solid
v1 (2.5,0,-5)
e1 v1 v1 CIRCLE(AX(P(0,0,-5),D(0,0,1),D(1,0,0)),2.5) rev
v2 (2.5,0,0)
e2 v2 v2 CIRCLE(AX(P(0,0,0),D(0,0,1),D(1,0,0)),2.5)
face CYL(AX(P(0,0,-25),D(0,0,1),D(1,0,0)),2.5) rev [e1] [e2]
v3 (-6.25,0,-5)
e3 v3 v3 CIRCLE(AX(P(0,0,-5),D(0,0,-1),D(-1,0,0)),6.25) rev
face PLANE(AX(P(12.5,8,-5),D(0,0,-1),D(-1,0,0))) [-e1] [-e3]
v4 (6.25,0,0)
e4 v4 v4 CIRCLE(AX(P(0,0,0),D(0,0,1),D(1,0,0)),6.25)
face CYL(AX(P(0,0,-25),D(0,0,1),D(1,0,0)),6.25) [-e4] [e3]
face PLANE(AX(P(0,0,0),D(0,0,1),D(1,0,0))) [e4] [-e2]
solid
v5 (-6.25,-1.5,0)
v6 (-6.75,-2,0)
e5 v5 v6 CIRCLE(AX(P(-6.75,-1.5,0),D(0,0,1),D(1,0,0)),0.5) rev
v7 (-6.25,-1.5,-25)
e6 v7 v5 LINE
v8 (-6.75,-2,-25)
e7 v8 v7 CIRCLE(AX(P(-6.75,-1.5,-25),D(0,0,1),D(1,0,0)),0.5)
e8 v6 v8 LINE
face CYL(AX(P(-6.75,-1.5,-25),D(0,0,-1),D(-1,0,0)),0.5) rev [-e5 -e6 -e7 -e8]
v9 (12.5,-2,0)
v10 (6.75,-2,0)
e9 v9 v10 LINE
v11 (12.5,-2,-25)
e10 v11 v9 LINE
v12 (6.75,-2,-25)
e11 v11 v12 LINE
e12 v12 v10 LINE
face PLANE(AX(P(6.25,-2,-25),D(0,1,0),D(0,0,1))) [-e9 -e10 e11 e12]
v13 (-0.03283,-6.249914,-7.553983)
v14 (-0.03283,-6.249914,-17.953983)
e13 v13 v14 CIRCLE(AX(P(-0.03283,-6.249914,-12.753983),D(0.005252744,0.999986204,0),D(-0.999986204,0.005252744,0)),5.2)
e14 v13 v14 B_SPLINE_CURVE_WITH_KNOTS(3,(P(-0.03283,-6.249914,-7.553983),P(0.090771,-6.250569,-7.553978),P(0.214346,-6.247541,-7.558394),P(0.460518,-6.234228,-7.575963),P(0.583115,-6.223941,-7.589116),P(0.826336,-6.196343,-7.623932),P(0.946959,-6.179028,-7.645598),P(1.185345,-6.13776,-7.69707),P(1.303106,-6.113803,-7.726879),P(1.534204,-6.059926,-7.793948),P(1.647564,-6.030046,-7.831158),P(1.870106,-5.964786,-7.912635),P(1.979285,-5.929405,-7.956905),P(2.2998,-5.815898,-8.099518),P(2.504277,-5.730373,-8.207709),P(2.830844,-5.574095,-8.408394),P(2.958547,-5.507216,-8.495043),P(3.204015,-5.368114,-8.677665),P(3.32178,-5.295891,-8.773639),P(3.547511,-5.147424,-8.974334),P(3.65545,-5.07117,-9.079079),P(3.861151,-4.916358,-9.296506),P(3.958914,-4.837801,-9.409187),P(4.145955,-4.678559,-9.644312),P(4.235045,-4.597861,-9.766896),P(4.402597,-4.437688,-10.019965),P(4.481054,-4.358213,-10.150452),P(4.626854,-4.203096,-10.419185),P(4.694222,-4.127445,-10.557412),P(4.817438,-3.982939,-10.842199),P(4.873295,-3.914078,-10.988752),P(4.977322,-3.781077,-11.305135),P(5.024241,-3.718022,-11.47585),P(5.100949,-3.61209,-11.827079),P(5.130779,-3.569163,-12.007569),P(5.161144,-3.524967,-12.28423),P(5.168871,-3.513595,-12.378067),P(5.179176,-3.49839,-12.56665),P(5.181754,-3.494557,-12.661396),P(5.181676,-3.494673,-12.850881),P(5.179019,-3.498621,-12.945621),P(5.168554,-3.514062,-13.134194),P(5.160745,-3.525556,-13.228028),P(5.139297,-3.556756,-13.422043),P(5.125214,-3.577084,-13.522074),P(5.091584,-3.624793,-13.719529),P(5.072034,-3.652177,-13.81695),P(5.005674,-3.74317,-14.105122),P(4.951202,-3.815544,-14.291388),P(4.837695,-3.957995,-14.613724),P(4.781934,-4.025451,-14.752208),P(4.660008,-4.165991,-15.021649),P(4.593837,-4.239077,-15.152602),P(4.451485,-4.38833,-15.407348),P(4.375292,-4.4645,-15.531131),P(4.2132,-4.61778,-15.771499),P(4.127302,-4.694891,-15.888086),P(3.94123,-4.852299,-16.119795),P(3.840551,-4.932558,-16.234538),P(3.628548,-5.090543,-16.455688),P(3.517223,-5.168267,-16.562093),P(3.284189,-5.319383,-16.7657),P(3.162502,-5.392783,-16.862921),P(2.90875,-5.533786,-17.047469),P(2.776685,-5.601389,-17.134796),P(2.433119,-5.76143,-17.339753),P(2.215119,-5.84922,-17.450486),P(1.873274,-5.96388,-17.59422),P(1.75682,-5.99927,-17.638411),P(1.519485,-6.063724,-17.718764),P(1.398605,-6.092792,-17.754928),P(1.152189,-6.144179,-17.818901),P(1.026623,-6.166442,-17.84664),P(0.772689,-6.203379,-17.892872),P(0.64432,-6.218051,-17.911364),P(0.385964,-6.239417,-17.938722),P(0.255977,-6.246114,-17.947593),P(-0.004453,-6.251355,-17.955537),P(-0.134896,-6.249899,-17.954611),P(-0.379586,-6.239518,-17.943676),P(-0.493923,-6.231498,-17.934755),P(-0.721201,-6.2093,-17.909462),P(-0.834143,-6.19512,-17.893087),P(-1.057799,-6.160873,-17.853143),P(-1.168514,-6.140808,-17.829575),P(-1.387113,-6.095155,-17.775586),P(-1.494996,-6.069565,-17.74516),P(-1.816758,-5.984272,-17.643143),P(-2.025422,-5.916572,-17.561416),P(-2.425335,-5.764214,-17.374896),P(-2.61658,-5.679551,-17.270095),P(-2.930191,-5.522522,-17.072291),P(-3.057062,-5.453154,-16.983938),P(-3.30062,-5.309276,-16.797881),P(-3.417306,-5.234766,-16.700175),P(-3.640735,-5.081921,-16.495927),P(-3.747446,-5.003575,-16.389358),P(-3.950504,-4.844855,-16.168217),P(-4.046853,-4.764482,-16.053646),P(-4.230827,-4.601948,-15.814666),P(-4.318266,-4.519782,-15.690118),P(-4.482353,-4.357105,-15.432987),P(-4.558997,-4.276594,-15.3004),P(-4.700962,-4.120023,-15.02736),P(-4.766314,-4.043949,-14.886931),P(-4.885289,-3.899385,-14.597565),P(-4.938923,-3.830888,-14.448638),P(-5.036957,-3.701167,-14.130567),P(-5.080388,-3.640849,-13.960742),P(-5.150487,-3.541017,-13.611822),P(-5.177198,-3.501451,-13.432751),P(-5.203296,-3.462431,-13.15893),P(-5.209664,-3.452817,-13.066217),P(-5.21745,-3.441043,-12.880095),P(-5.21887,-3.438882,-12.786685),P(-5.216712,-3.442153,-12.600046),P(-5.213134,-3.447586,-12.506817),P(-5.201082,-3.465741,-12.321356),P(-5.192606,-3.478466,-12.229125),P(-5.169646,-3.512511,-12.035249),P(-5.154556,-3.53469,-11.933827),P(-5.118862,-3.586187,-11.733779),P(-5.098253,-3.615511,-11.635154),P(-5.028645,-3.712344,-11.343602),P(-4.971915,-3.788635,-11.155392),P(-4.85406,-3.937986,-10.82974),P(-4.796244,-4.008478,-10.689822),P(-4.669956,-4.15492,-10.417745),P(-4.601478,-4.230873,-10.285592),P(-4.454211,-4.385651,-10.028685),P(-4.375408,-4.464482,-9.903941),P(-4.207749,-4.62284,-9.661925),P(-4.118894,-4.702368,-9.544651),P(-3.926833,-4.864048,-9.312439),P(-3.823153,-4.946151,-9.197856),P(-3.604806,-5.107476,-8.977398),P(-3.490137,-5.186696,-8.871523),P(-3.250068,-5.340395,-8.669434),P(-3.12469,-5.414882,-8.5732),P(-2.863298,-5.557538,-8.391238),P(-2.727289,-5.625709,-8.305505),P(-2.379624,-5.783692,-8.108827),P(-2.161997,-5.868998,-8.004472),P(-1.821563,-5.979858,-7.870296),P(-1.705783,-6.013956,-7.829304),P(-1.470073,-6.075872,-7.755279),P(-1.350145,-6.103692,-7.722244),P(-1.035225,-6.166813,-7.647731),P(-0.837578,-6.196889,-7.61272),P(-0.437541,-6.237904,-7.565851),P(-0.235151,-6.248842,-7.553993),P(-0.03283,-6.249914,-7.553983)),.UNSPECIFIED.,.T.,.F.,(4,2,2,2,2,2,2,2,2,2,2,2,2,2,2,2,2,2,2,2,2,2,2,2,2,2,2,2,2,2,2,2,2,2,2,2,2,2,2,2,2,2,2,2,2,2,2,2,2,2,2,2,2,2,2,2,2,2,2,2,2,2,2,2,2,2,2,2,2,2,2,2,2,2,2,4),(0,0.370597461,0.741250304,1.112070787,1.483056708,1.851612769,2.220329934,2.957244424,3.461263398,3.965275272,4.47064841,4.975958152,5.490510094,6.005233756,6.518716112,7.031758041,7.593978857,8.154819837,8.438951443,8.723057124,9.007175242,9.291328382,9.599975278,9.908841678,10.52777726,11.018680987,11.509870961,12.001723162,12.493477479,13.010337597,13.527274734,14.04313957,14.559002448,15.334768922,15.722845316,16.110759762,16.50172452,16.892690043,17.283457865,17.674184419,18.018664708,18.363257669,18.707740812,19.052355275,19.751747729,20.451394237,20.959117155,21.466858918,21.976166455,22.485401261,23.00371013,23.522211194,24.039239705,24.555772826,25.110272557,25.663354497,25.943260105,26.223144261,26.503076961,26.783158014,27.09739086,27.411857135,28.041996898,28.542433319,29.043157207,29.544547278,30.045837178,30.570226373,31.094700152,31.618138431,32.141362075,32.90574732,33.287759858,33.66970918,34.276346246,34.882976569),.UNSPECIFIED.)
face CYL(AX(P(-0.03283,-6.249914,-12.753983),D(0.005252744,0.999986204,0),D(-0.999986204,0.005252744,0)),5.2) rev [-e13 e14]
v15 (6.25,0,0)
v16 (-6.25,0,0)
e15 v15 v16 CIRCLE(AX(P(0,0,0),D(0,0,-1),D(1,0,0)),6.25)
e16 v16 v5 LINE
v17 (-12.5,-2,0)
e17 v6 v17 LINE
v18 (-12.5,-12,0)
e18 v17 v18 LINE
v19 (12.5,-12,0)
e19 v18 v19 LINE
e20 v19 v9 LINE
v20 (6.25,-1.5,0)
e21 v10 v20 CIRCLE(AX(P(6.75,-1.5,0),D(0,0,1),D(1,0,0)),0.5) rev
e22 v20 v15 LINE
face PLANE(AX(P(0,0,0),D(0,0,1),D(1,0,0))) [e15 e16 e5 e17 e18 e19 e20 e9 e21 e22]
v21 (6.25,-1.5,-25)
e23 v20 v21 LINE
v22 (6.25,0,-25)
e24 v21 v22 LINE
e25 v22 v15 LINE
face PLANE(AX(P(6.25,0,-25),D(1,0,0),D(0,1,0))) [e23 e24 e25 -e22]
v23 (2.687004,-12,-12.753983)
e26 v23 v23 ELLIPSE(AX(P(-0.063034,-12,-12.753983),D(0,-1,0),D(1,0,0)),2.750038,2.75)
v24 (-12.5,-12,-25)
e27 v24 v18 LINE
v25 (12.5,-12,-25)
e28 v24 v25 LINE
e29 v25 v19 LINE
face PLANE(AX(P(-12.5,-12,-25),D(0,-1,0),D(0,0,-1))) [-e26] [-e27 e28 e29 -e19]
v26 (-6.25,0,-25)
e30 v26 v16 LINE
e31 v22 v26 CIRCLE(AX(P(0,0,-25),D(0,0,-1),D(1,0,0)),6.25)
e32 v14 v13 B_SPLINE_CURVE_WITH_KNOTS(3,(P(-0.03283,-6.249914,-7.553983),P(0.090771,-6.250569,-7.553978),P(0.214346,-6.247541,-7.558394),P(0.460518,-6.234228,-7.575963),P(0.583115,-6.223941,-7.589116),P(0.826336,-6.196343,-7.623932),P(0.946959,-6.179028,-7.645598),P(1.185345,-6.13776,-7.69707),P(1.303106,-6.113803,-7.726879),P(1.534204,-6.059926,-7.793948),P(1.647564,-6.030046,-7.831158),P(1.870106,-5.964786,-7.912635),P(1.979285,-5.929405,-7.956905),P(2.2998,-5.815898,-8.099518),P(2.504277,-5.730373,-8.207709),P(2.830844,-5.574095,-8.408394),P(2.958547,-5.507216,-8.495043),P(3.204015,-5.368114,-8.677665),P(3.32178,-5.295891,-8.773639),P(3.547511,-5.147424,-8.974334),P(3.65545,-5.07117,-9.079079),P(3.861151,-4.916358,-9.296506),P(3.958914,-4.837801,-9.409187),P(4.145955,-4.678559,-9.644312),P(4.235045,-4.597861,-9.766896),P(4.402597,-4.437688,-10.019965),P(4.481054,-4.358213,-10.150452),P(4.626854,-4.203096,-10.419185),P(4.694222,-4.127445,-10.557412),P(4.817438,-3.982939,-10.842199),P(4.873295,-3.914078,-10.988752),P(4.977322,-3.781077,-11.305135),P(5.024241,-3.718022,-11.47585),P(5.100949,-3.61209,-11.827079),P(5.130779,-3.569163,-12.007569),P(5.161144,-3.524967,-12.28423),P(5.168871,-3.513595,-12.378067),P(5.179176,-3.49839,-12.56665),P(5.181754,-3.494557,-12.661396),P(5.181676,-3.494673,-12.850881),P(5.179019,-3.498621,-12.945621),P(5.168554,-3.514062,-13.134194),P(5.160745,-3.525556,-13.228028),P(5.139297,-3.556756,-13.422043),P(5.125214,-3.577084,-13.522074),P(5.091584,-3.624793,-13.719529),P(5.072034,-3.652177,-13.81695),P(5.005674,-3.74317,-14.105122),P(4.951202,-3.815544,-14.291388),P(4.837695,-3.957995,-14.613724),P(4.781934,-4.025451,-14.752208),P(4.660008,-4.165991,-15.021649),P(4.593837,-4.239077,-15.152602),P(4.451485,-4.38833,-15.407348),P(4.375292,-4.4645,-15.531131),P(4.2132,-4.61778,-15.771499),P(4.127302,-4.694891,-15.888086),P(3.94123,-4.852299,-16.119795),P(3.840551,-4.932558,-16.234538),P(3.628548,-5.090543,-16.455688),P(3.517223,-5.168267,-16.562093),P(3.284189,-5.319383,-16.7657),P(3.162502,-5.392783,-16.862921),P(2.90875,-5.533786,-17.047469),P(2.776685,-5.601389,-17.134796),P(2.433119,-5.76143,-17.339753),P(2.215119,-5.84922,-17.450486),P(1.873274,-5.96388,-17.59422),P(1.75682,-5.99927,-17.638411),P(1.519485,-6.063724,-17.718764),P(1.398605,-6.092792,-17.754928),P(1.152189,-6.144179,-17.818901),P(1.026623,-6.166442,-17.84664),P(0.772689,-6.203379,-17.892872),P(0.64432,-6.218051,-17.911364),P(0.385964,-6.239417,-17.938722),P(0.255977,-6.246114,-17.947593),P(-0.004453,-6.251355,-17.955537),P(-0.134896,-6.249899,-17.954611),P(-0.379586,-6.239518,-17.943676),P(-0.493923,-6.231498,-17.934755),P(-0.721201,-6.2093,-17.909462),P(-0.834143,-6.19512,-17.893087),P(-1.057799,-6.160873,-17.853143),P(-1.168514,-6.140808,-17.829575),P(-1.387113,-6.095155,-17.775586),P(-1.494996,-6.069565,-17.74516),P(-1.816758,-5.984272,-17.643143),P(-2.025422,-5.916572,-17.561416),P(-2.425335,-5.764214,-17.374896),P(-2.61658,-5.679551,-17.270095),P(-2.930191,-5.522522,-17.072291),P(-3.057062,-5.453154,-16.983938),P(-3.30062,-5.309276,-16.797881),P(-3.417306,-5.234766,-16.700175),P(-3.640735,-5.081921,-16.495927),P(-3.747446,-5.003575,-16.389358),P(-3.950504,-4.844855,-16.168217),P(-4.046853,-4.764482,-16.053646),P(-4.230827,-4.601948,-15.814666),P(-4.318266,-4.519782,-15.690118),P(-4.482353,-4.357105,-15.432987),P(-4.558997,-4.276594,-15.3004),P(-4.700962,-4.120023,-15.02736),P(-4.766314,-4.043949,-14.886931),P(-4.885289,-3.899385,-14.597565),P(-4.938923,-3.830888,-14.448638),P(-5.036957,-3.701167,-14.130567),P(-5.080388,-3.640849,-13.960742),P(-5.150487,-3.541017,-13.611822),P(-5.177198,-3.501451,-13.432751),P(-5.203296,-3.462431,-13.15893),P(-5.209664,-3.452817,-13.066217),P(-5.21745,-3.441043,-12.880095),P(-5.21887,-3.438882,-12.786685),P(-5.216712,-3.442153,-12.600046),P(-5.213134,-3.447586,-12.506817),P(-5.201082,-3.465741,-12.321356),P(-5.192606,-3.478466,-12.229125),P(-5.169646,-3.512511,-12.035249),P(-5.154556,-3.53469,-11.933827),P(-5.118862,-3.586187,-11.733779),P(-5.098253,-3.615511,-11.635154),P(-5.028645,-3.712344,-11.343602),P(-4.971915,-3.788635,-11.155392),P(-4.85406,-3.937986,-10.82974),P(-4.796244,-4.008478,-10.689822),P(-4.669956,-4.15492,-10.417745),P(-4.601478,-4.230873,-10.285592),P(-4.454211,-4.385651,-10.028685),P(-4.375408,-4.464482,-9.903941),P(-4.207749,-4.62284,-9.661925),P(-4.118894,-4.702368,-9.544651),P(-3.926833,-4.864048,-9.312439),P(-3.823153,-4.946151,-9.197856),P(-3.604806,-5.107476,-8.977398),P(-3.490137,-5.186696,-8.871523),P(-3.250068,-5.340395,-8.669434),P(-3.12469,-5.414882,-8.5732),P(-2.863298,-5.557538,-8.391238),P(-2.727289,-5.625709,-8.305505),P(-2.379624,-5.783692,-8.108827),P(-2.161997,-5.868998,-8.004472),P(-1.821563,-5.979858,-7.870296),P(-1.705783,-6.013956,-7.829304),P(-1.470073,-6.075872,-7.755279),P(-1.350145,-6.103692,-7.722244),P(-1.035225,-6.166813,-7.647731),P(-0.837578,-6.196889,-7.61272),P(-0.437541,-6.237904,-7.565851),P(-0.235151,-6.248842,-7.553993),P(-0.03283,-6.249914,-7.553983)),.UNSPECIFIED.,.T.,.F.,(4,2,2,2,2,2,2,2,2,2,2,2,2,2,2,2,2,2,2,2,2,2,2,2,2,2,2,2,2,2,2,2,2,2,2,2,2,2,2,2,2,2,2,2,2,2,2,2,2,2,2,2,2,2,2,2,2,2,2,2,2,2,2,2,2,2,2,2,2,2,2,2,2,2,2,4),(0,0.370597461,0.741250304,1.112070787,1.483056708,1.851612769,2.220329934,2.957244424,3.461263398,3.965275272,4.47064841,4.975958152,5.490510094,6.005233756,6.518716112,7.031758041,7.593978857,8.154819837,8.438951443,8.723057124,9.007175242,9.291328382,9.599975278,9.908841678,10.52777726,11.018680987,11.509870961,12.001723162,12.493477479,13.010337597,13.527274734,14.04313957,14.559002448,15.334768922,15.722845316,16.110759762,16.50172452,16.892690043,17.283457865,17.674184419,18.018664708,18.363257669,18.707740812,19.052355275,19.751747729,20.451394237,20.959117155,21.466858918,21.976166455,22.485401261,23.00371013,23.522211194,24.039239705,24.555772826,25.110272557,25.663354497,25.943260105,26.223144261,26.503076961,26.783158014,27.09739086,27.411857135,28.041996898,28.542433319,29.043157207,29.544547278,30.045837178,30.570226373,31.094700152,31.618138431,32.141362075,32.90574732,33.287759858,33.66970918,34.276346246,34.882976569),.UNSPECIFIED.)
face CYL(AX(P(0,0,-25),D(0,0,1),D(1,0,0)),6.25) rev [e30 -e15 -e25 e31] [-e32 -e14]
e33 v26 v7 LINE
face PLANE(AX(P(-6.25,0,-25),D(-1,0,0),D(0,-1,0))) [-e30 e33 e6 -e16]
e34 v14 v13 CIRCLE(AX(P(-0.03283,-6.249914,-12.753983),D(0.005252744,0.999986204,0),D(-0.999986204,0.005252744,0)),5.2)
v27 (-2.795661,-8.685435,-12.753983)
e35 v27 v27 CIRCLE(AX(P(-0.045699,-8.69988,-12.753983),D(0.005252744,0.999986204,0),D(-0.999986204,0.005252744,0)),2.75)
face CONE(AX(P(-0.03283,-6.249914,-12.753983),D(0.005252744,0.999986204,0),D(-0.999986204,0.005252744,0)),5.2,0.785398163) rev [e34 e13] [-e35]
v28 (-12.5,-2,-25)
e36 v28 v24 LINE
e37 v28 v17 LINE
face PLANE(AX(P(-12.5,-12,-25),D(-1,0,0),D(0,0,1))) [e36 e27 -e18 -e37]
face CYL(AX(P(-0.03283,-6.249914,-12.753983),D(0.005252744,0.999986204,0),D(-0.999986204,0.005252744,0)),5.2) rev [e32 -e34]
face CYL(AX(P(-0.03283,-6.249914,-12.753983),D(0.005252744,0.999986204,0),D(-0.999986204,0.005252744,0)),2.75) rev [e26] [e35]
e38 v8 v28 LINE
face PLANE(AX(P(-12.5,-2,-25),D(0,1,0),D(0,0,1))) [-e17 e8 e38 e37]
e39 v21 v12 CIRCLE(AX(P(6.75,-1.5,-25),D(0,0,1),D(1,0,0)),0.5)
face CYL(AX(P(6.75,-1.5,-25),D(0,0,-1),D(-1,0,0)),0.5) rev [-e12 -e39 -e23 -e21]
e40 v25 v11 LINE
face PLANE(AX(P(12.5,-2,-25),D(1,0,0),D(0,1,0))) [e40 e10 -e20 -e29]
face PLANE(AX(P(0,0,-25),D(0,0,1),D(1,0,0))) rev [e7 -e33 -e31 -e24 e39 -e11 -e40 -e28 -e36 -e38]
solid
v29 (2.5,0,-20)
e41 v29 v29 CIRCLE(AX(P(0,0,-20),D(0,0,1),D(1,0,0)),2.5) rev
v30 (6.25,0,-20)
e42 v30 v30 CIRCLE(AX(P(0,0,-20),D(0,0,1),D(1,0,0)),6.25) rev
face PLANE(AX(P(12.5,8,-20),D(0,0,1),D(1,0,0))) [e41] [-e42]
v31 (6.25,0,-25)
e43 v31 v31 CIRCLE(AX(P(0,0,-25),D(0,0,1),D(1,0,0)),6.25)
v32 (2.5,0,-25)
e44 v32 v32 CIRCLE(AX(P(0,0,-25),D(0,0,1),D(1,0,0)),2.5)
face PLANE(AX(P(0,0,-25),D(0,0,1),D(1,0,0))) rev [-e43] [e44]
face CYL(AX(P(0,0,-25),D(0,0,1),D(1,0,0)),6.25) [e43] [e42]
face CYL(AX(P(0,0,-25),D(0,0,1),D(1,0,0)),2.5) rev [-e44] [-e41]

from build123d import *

# Parameters (mm, degrees)
SKETCH2_R           = 6.25
BOSS_EXTRUDE1_DEPTH = 25
BOSS_EXTRUDE2_DEPTH = 25
SKETCH5_R           = 2.5
CUT_EXTRUDE1_DEPTH  = 25
FILLET1_R           = 0.5
SKETCH6_W           = 25
SKETCH6_H           = 15
CUT_EXTRUDE2_DEPTH  = 10
SKETCH8_R           = 6.5
CUT_EXTRUDE5_DEPTH  = 15


# Read off the part's stored shape, not the designer's step: CSK for M5 Flat Head Machine Screw4
with BuildPart() as part:
    # Sketch2 → Boss-Extrude1 (new body)
    with BuildSketch(Plane.XY):
        Circle(SKETCH2_R)
    extrude(amount=-BOSS_EXTRUDE1_DEPTH)

    # Sketch5 → Cut-Extrude1 (cut)
    with BuildSketch(Plane.XY):
        Circle(SKETCH5_R)
    extrude(amount=-CUT_EXTRUDE1_DEPTH, mode=Mode.SUBTRACT)

    # Sketch6 → Cut-Extrude2 (cut)
    with BuildSketch(Plane(origin=(0, -2, 0), x_dir=(1, 0, 0), z_dir=(0, 1, 0))):
        with Locations((0, 12.5)):
            Rectangle(SKETCH6_W, SKETCH6_H)
    extrude(amount=CUT_EXTRUDE2_DEPTH, mode=Mode.SUBTRACT)

    # Sketch8 → Cut-Extrude5 (cut)
    with BuildSketch(Plane.XY.offset(-20)):
        Circle(SKETCH8_R)
    extrude(amount=CUT_EXTRUDE5_DEPTH, mode=Mode.SUBTRACT)


with BuildPart() as body_2:
    # Sketch4 → Boss-Extrude2 (new body)
    with BuildSketch(Plane.XY):
        with BuildLine():
            Line((-6.25, 0), (-6.25, -2))
            Line((-6.25, -2), (-12.5, -2))
            Line((-12.5, -2), (-12.5, -12))
            Line((-12.5, -12), (12.5, -12))
            Line((12.5, -12), (12.5, -2))
            Line((12.5, -2), (6.25, -2))
            Line((6.25, -2), (6.25, 0))
            ThreePointArc((6.25, 0), (0, -6.25), (-6.25, 0))
        make_face()
    extrude(amount=-BOSS_EXTRUDE2_DEPTH)

    # Fillet1
    fillet1_edges = [body_2.edges().sort_by_distance(p)[0] for p in [
        (6.25, -2, -12.5),
        (-6.25, -2, -12.5),
    ]]
    fillet(fillet1_edges, radius=FILLET1_R)

    # CSK for M5 Flat Head Machine Screw4 outl → CSK for M5 Flat Head Machine Screw4 (revolve, cut)
    with BuildSketch(Plane(origin=(0, 0, -12.753983412), x_dir=(0.9999862042460785, -0.005252743808715838, 0), z_dir=(0, 0, 1))):
        Polygon((2.75, -8.7), (5.2, -6.25), (5.2, -3.466872661), (2.75, -3.466872661), align=None)
        Polygon((2.75, -12.014610796), (2.75, -8.7), (2.75, -3.466872661), (0, -3.466872661), (0, -12.014610796), align=None)
    revolve(axis=Axis((0, 0, -12.753983412), (0.005252743808715838, 0.9999862042460785, 0)), mode=Mode.SUBTRACT)


with BuildPart() as cut_extrude5_piece_1:
    # of the separate pieces the step leaves, piece 1, a body of its own (cut_extrude5_pieces)
    add(part.part.solids().sort_by_distance((6.25, 0, 0))[0])


with BuildPart() as cut_extrude5_piece_2:
    # of the separate pieces the step leaves, piece 2, a body of its own (cut_extrude5_pieces)
    add(part.part.solids().sort_by_distance((6.25, 0, -20))[0])


solid = Compound([body_2.part, cut_extrude5_piece_1.part, cut_extrude5_piece_2.part])
